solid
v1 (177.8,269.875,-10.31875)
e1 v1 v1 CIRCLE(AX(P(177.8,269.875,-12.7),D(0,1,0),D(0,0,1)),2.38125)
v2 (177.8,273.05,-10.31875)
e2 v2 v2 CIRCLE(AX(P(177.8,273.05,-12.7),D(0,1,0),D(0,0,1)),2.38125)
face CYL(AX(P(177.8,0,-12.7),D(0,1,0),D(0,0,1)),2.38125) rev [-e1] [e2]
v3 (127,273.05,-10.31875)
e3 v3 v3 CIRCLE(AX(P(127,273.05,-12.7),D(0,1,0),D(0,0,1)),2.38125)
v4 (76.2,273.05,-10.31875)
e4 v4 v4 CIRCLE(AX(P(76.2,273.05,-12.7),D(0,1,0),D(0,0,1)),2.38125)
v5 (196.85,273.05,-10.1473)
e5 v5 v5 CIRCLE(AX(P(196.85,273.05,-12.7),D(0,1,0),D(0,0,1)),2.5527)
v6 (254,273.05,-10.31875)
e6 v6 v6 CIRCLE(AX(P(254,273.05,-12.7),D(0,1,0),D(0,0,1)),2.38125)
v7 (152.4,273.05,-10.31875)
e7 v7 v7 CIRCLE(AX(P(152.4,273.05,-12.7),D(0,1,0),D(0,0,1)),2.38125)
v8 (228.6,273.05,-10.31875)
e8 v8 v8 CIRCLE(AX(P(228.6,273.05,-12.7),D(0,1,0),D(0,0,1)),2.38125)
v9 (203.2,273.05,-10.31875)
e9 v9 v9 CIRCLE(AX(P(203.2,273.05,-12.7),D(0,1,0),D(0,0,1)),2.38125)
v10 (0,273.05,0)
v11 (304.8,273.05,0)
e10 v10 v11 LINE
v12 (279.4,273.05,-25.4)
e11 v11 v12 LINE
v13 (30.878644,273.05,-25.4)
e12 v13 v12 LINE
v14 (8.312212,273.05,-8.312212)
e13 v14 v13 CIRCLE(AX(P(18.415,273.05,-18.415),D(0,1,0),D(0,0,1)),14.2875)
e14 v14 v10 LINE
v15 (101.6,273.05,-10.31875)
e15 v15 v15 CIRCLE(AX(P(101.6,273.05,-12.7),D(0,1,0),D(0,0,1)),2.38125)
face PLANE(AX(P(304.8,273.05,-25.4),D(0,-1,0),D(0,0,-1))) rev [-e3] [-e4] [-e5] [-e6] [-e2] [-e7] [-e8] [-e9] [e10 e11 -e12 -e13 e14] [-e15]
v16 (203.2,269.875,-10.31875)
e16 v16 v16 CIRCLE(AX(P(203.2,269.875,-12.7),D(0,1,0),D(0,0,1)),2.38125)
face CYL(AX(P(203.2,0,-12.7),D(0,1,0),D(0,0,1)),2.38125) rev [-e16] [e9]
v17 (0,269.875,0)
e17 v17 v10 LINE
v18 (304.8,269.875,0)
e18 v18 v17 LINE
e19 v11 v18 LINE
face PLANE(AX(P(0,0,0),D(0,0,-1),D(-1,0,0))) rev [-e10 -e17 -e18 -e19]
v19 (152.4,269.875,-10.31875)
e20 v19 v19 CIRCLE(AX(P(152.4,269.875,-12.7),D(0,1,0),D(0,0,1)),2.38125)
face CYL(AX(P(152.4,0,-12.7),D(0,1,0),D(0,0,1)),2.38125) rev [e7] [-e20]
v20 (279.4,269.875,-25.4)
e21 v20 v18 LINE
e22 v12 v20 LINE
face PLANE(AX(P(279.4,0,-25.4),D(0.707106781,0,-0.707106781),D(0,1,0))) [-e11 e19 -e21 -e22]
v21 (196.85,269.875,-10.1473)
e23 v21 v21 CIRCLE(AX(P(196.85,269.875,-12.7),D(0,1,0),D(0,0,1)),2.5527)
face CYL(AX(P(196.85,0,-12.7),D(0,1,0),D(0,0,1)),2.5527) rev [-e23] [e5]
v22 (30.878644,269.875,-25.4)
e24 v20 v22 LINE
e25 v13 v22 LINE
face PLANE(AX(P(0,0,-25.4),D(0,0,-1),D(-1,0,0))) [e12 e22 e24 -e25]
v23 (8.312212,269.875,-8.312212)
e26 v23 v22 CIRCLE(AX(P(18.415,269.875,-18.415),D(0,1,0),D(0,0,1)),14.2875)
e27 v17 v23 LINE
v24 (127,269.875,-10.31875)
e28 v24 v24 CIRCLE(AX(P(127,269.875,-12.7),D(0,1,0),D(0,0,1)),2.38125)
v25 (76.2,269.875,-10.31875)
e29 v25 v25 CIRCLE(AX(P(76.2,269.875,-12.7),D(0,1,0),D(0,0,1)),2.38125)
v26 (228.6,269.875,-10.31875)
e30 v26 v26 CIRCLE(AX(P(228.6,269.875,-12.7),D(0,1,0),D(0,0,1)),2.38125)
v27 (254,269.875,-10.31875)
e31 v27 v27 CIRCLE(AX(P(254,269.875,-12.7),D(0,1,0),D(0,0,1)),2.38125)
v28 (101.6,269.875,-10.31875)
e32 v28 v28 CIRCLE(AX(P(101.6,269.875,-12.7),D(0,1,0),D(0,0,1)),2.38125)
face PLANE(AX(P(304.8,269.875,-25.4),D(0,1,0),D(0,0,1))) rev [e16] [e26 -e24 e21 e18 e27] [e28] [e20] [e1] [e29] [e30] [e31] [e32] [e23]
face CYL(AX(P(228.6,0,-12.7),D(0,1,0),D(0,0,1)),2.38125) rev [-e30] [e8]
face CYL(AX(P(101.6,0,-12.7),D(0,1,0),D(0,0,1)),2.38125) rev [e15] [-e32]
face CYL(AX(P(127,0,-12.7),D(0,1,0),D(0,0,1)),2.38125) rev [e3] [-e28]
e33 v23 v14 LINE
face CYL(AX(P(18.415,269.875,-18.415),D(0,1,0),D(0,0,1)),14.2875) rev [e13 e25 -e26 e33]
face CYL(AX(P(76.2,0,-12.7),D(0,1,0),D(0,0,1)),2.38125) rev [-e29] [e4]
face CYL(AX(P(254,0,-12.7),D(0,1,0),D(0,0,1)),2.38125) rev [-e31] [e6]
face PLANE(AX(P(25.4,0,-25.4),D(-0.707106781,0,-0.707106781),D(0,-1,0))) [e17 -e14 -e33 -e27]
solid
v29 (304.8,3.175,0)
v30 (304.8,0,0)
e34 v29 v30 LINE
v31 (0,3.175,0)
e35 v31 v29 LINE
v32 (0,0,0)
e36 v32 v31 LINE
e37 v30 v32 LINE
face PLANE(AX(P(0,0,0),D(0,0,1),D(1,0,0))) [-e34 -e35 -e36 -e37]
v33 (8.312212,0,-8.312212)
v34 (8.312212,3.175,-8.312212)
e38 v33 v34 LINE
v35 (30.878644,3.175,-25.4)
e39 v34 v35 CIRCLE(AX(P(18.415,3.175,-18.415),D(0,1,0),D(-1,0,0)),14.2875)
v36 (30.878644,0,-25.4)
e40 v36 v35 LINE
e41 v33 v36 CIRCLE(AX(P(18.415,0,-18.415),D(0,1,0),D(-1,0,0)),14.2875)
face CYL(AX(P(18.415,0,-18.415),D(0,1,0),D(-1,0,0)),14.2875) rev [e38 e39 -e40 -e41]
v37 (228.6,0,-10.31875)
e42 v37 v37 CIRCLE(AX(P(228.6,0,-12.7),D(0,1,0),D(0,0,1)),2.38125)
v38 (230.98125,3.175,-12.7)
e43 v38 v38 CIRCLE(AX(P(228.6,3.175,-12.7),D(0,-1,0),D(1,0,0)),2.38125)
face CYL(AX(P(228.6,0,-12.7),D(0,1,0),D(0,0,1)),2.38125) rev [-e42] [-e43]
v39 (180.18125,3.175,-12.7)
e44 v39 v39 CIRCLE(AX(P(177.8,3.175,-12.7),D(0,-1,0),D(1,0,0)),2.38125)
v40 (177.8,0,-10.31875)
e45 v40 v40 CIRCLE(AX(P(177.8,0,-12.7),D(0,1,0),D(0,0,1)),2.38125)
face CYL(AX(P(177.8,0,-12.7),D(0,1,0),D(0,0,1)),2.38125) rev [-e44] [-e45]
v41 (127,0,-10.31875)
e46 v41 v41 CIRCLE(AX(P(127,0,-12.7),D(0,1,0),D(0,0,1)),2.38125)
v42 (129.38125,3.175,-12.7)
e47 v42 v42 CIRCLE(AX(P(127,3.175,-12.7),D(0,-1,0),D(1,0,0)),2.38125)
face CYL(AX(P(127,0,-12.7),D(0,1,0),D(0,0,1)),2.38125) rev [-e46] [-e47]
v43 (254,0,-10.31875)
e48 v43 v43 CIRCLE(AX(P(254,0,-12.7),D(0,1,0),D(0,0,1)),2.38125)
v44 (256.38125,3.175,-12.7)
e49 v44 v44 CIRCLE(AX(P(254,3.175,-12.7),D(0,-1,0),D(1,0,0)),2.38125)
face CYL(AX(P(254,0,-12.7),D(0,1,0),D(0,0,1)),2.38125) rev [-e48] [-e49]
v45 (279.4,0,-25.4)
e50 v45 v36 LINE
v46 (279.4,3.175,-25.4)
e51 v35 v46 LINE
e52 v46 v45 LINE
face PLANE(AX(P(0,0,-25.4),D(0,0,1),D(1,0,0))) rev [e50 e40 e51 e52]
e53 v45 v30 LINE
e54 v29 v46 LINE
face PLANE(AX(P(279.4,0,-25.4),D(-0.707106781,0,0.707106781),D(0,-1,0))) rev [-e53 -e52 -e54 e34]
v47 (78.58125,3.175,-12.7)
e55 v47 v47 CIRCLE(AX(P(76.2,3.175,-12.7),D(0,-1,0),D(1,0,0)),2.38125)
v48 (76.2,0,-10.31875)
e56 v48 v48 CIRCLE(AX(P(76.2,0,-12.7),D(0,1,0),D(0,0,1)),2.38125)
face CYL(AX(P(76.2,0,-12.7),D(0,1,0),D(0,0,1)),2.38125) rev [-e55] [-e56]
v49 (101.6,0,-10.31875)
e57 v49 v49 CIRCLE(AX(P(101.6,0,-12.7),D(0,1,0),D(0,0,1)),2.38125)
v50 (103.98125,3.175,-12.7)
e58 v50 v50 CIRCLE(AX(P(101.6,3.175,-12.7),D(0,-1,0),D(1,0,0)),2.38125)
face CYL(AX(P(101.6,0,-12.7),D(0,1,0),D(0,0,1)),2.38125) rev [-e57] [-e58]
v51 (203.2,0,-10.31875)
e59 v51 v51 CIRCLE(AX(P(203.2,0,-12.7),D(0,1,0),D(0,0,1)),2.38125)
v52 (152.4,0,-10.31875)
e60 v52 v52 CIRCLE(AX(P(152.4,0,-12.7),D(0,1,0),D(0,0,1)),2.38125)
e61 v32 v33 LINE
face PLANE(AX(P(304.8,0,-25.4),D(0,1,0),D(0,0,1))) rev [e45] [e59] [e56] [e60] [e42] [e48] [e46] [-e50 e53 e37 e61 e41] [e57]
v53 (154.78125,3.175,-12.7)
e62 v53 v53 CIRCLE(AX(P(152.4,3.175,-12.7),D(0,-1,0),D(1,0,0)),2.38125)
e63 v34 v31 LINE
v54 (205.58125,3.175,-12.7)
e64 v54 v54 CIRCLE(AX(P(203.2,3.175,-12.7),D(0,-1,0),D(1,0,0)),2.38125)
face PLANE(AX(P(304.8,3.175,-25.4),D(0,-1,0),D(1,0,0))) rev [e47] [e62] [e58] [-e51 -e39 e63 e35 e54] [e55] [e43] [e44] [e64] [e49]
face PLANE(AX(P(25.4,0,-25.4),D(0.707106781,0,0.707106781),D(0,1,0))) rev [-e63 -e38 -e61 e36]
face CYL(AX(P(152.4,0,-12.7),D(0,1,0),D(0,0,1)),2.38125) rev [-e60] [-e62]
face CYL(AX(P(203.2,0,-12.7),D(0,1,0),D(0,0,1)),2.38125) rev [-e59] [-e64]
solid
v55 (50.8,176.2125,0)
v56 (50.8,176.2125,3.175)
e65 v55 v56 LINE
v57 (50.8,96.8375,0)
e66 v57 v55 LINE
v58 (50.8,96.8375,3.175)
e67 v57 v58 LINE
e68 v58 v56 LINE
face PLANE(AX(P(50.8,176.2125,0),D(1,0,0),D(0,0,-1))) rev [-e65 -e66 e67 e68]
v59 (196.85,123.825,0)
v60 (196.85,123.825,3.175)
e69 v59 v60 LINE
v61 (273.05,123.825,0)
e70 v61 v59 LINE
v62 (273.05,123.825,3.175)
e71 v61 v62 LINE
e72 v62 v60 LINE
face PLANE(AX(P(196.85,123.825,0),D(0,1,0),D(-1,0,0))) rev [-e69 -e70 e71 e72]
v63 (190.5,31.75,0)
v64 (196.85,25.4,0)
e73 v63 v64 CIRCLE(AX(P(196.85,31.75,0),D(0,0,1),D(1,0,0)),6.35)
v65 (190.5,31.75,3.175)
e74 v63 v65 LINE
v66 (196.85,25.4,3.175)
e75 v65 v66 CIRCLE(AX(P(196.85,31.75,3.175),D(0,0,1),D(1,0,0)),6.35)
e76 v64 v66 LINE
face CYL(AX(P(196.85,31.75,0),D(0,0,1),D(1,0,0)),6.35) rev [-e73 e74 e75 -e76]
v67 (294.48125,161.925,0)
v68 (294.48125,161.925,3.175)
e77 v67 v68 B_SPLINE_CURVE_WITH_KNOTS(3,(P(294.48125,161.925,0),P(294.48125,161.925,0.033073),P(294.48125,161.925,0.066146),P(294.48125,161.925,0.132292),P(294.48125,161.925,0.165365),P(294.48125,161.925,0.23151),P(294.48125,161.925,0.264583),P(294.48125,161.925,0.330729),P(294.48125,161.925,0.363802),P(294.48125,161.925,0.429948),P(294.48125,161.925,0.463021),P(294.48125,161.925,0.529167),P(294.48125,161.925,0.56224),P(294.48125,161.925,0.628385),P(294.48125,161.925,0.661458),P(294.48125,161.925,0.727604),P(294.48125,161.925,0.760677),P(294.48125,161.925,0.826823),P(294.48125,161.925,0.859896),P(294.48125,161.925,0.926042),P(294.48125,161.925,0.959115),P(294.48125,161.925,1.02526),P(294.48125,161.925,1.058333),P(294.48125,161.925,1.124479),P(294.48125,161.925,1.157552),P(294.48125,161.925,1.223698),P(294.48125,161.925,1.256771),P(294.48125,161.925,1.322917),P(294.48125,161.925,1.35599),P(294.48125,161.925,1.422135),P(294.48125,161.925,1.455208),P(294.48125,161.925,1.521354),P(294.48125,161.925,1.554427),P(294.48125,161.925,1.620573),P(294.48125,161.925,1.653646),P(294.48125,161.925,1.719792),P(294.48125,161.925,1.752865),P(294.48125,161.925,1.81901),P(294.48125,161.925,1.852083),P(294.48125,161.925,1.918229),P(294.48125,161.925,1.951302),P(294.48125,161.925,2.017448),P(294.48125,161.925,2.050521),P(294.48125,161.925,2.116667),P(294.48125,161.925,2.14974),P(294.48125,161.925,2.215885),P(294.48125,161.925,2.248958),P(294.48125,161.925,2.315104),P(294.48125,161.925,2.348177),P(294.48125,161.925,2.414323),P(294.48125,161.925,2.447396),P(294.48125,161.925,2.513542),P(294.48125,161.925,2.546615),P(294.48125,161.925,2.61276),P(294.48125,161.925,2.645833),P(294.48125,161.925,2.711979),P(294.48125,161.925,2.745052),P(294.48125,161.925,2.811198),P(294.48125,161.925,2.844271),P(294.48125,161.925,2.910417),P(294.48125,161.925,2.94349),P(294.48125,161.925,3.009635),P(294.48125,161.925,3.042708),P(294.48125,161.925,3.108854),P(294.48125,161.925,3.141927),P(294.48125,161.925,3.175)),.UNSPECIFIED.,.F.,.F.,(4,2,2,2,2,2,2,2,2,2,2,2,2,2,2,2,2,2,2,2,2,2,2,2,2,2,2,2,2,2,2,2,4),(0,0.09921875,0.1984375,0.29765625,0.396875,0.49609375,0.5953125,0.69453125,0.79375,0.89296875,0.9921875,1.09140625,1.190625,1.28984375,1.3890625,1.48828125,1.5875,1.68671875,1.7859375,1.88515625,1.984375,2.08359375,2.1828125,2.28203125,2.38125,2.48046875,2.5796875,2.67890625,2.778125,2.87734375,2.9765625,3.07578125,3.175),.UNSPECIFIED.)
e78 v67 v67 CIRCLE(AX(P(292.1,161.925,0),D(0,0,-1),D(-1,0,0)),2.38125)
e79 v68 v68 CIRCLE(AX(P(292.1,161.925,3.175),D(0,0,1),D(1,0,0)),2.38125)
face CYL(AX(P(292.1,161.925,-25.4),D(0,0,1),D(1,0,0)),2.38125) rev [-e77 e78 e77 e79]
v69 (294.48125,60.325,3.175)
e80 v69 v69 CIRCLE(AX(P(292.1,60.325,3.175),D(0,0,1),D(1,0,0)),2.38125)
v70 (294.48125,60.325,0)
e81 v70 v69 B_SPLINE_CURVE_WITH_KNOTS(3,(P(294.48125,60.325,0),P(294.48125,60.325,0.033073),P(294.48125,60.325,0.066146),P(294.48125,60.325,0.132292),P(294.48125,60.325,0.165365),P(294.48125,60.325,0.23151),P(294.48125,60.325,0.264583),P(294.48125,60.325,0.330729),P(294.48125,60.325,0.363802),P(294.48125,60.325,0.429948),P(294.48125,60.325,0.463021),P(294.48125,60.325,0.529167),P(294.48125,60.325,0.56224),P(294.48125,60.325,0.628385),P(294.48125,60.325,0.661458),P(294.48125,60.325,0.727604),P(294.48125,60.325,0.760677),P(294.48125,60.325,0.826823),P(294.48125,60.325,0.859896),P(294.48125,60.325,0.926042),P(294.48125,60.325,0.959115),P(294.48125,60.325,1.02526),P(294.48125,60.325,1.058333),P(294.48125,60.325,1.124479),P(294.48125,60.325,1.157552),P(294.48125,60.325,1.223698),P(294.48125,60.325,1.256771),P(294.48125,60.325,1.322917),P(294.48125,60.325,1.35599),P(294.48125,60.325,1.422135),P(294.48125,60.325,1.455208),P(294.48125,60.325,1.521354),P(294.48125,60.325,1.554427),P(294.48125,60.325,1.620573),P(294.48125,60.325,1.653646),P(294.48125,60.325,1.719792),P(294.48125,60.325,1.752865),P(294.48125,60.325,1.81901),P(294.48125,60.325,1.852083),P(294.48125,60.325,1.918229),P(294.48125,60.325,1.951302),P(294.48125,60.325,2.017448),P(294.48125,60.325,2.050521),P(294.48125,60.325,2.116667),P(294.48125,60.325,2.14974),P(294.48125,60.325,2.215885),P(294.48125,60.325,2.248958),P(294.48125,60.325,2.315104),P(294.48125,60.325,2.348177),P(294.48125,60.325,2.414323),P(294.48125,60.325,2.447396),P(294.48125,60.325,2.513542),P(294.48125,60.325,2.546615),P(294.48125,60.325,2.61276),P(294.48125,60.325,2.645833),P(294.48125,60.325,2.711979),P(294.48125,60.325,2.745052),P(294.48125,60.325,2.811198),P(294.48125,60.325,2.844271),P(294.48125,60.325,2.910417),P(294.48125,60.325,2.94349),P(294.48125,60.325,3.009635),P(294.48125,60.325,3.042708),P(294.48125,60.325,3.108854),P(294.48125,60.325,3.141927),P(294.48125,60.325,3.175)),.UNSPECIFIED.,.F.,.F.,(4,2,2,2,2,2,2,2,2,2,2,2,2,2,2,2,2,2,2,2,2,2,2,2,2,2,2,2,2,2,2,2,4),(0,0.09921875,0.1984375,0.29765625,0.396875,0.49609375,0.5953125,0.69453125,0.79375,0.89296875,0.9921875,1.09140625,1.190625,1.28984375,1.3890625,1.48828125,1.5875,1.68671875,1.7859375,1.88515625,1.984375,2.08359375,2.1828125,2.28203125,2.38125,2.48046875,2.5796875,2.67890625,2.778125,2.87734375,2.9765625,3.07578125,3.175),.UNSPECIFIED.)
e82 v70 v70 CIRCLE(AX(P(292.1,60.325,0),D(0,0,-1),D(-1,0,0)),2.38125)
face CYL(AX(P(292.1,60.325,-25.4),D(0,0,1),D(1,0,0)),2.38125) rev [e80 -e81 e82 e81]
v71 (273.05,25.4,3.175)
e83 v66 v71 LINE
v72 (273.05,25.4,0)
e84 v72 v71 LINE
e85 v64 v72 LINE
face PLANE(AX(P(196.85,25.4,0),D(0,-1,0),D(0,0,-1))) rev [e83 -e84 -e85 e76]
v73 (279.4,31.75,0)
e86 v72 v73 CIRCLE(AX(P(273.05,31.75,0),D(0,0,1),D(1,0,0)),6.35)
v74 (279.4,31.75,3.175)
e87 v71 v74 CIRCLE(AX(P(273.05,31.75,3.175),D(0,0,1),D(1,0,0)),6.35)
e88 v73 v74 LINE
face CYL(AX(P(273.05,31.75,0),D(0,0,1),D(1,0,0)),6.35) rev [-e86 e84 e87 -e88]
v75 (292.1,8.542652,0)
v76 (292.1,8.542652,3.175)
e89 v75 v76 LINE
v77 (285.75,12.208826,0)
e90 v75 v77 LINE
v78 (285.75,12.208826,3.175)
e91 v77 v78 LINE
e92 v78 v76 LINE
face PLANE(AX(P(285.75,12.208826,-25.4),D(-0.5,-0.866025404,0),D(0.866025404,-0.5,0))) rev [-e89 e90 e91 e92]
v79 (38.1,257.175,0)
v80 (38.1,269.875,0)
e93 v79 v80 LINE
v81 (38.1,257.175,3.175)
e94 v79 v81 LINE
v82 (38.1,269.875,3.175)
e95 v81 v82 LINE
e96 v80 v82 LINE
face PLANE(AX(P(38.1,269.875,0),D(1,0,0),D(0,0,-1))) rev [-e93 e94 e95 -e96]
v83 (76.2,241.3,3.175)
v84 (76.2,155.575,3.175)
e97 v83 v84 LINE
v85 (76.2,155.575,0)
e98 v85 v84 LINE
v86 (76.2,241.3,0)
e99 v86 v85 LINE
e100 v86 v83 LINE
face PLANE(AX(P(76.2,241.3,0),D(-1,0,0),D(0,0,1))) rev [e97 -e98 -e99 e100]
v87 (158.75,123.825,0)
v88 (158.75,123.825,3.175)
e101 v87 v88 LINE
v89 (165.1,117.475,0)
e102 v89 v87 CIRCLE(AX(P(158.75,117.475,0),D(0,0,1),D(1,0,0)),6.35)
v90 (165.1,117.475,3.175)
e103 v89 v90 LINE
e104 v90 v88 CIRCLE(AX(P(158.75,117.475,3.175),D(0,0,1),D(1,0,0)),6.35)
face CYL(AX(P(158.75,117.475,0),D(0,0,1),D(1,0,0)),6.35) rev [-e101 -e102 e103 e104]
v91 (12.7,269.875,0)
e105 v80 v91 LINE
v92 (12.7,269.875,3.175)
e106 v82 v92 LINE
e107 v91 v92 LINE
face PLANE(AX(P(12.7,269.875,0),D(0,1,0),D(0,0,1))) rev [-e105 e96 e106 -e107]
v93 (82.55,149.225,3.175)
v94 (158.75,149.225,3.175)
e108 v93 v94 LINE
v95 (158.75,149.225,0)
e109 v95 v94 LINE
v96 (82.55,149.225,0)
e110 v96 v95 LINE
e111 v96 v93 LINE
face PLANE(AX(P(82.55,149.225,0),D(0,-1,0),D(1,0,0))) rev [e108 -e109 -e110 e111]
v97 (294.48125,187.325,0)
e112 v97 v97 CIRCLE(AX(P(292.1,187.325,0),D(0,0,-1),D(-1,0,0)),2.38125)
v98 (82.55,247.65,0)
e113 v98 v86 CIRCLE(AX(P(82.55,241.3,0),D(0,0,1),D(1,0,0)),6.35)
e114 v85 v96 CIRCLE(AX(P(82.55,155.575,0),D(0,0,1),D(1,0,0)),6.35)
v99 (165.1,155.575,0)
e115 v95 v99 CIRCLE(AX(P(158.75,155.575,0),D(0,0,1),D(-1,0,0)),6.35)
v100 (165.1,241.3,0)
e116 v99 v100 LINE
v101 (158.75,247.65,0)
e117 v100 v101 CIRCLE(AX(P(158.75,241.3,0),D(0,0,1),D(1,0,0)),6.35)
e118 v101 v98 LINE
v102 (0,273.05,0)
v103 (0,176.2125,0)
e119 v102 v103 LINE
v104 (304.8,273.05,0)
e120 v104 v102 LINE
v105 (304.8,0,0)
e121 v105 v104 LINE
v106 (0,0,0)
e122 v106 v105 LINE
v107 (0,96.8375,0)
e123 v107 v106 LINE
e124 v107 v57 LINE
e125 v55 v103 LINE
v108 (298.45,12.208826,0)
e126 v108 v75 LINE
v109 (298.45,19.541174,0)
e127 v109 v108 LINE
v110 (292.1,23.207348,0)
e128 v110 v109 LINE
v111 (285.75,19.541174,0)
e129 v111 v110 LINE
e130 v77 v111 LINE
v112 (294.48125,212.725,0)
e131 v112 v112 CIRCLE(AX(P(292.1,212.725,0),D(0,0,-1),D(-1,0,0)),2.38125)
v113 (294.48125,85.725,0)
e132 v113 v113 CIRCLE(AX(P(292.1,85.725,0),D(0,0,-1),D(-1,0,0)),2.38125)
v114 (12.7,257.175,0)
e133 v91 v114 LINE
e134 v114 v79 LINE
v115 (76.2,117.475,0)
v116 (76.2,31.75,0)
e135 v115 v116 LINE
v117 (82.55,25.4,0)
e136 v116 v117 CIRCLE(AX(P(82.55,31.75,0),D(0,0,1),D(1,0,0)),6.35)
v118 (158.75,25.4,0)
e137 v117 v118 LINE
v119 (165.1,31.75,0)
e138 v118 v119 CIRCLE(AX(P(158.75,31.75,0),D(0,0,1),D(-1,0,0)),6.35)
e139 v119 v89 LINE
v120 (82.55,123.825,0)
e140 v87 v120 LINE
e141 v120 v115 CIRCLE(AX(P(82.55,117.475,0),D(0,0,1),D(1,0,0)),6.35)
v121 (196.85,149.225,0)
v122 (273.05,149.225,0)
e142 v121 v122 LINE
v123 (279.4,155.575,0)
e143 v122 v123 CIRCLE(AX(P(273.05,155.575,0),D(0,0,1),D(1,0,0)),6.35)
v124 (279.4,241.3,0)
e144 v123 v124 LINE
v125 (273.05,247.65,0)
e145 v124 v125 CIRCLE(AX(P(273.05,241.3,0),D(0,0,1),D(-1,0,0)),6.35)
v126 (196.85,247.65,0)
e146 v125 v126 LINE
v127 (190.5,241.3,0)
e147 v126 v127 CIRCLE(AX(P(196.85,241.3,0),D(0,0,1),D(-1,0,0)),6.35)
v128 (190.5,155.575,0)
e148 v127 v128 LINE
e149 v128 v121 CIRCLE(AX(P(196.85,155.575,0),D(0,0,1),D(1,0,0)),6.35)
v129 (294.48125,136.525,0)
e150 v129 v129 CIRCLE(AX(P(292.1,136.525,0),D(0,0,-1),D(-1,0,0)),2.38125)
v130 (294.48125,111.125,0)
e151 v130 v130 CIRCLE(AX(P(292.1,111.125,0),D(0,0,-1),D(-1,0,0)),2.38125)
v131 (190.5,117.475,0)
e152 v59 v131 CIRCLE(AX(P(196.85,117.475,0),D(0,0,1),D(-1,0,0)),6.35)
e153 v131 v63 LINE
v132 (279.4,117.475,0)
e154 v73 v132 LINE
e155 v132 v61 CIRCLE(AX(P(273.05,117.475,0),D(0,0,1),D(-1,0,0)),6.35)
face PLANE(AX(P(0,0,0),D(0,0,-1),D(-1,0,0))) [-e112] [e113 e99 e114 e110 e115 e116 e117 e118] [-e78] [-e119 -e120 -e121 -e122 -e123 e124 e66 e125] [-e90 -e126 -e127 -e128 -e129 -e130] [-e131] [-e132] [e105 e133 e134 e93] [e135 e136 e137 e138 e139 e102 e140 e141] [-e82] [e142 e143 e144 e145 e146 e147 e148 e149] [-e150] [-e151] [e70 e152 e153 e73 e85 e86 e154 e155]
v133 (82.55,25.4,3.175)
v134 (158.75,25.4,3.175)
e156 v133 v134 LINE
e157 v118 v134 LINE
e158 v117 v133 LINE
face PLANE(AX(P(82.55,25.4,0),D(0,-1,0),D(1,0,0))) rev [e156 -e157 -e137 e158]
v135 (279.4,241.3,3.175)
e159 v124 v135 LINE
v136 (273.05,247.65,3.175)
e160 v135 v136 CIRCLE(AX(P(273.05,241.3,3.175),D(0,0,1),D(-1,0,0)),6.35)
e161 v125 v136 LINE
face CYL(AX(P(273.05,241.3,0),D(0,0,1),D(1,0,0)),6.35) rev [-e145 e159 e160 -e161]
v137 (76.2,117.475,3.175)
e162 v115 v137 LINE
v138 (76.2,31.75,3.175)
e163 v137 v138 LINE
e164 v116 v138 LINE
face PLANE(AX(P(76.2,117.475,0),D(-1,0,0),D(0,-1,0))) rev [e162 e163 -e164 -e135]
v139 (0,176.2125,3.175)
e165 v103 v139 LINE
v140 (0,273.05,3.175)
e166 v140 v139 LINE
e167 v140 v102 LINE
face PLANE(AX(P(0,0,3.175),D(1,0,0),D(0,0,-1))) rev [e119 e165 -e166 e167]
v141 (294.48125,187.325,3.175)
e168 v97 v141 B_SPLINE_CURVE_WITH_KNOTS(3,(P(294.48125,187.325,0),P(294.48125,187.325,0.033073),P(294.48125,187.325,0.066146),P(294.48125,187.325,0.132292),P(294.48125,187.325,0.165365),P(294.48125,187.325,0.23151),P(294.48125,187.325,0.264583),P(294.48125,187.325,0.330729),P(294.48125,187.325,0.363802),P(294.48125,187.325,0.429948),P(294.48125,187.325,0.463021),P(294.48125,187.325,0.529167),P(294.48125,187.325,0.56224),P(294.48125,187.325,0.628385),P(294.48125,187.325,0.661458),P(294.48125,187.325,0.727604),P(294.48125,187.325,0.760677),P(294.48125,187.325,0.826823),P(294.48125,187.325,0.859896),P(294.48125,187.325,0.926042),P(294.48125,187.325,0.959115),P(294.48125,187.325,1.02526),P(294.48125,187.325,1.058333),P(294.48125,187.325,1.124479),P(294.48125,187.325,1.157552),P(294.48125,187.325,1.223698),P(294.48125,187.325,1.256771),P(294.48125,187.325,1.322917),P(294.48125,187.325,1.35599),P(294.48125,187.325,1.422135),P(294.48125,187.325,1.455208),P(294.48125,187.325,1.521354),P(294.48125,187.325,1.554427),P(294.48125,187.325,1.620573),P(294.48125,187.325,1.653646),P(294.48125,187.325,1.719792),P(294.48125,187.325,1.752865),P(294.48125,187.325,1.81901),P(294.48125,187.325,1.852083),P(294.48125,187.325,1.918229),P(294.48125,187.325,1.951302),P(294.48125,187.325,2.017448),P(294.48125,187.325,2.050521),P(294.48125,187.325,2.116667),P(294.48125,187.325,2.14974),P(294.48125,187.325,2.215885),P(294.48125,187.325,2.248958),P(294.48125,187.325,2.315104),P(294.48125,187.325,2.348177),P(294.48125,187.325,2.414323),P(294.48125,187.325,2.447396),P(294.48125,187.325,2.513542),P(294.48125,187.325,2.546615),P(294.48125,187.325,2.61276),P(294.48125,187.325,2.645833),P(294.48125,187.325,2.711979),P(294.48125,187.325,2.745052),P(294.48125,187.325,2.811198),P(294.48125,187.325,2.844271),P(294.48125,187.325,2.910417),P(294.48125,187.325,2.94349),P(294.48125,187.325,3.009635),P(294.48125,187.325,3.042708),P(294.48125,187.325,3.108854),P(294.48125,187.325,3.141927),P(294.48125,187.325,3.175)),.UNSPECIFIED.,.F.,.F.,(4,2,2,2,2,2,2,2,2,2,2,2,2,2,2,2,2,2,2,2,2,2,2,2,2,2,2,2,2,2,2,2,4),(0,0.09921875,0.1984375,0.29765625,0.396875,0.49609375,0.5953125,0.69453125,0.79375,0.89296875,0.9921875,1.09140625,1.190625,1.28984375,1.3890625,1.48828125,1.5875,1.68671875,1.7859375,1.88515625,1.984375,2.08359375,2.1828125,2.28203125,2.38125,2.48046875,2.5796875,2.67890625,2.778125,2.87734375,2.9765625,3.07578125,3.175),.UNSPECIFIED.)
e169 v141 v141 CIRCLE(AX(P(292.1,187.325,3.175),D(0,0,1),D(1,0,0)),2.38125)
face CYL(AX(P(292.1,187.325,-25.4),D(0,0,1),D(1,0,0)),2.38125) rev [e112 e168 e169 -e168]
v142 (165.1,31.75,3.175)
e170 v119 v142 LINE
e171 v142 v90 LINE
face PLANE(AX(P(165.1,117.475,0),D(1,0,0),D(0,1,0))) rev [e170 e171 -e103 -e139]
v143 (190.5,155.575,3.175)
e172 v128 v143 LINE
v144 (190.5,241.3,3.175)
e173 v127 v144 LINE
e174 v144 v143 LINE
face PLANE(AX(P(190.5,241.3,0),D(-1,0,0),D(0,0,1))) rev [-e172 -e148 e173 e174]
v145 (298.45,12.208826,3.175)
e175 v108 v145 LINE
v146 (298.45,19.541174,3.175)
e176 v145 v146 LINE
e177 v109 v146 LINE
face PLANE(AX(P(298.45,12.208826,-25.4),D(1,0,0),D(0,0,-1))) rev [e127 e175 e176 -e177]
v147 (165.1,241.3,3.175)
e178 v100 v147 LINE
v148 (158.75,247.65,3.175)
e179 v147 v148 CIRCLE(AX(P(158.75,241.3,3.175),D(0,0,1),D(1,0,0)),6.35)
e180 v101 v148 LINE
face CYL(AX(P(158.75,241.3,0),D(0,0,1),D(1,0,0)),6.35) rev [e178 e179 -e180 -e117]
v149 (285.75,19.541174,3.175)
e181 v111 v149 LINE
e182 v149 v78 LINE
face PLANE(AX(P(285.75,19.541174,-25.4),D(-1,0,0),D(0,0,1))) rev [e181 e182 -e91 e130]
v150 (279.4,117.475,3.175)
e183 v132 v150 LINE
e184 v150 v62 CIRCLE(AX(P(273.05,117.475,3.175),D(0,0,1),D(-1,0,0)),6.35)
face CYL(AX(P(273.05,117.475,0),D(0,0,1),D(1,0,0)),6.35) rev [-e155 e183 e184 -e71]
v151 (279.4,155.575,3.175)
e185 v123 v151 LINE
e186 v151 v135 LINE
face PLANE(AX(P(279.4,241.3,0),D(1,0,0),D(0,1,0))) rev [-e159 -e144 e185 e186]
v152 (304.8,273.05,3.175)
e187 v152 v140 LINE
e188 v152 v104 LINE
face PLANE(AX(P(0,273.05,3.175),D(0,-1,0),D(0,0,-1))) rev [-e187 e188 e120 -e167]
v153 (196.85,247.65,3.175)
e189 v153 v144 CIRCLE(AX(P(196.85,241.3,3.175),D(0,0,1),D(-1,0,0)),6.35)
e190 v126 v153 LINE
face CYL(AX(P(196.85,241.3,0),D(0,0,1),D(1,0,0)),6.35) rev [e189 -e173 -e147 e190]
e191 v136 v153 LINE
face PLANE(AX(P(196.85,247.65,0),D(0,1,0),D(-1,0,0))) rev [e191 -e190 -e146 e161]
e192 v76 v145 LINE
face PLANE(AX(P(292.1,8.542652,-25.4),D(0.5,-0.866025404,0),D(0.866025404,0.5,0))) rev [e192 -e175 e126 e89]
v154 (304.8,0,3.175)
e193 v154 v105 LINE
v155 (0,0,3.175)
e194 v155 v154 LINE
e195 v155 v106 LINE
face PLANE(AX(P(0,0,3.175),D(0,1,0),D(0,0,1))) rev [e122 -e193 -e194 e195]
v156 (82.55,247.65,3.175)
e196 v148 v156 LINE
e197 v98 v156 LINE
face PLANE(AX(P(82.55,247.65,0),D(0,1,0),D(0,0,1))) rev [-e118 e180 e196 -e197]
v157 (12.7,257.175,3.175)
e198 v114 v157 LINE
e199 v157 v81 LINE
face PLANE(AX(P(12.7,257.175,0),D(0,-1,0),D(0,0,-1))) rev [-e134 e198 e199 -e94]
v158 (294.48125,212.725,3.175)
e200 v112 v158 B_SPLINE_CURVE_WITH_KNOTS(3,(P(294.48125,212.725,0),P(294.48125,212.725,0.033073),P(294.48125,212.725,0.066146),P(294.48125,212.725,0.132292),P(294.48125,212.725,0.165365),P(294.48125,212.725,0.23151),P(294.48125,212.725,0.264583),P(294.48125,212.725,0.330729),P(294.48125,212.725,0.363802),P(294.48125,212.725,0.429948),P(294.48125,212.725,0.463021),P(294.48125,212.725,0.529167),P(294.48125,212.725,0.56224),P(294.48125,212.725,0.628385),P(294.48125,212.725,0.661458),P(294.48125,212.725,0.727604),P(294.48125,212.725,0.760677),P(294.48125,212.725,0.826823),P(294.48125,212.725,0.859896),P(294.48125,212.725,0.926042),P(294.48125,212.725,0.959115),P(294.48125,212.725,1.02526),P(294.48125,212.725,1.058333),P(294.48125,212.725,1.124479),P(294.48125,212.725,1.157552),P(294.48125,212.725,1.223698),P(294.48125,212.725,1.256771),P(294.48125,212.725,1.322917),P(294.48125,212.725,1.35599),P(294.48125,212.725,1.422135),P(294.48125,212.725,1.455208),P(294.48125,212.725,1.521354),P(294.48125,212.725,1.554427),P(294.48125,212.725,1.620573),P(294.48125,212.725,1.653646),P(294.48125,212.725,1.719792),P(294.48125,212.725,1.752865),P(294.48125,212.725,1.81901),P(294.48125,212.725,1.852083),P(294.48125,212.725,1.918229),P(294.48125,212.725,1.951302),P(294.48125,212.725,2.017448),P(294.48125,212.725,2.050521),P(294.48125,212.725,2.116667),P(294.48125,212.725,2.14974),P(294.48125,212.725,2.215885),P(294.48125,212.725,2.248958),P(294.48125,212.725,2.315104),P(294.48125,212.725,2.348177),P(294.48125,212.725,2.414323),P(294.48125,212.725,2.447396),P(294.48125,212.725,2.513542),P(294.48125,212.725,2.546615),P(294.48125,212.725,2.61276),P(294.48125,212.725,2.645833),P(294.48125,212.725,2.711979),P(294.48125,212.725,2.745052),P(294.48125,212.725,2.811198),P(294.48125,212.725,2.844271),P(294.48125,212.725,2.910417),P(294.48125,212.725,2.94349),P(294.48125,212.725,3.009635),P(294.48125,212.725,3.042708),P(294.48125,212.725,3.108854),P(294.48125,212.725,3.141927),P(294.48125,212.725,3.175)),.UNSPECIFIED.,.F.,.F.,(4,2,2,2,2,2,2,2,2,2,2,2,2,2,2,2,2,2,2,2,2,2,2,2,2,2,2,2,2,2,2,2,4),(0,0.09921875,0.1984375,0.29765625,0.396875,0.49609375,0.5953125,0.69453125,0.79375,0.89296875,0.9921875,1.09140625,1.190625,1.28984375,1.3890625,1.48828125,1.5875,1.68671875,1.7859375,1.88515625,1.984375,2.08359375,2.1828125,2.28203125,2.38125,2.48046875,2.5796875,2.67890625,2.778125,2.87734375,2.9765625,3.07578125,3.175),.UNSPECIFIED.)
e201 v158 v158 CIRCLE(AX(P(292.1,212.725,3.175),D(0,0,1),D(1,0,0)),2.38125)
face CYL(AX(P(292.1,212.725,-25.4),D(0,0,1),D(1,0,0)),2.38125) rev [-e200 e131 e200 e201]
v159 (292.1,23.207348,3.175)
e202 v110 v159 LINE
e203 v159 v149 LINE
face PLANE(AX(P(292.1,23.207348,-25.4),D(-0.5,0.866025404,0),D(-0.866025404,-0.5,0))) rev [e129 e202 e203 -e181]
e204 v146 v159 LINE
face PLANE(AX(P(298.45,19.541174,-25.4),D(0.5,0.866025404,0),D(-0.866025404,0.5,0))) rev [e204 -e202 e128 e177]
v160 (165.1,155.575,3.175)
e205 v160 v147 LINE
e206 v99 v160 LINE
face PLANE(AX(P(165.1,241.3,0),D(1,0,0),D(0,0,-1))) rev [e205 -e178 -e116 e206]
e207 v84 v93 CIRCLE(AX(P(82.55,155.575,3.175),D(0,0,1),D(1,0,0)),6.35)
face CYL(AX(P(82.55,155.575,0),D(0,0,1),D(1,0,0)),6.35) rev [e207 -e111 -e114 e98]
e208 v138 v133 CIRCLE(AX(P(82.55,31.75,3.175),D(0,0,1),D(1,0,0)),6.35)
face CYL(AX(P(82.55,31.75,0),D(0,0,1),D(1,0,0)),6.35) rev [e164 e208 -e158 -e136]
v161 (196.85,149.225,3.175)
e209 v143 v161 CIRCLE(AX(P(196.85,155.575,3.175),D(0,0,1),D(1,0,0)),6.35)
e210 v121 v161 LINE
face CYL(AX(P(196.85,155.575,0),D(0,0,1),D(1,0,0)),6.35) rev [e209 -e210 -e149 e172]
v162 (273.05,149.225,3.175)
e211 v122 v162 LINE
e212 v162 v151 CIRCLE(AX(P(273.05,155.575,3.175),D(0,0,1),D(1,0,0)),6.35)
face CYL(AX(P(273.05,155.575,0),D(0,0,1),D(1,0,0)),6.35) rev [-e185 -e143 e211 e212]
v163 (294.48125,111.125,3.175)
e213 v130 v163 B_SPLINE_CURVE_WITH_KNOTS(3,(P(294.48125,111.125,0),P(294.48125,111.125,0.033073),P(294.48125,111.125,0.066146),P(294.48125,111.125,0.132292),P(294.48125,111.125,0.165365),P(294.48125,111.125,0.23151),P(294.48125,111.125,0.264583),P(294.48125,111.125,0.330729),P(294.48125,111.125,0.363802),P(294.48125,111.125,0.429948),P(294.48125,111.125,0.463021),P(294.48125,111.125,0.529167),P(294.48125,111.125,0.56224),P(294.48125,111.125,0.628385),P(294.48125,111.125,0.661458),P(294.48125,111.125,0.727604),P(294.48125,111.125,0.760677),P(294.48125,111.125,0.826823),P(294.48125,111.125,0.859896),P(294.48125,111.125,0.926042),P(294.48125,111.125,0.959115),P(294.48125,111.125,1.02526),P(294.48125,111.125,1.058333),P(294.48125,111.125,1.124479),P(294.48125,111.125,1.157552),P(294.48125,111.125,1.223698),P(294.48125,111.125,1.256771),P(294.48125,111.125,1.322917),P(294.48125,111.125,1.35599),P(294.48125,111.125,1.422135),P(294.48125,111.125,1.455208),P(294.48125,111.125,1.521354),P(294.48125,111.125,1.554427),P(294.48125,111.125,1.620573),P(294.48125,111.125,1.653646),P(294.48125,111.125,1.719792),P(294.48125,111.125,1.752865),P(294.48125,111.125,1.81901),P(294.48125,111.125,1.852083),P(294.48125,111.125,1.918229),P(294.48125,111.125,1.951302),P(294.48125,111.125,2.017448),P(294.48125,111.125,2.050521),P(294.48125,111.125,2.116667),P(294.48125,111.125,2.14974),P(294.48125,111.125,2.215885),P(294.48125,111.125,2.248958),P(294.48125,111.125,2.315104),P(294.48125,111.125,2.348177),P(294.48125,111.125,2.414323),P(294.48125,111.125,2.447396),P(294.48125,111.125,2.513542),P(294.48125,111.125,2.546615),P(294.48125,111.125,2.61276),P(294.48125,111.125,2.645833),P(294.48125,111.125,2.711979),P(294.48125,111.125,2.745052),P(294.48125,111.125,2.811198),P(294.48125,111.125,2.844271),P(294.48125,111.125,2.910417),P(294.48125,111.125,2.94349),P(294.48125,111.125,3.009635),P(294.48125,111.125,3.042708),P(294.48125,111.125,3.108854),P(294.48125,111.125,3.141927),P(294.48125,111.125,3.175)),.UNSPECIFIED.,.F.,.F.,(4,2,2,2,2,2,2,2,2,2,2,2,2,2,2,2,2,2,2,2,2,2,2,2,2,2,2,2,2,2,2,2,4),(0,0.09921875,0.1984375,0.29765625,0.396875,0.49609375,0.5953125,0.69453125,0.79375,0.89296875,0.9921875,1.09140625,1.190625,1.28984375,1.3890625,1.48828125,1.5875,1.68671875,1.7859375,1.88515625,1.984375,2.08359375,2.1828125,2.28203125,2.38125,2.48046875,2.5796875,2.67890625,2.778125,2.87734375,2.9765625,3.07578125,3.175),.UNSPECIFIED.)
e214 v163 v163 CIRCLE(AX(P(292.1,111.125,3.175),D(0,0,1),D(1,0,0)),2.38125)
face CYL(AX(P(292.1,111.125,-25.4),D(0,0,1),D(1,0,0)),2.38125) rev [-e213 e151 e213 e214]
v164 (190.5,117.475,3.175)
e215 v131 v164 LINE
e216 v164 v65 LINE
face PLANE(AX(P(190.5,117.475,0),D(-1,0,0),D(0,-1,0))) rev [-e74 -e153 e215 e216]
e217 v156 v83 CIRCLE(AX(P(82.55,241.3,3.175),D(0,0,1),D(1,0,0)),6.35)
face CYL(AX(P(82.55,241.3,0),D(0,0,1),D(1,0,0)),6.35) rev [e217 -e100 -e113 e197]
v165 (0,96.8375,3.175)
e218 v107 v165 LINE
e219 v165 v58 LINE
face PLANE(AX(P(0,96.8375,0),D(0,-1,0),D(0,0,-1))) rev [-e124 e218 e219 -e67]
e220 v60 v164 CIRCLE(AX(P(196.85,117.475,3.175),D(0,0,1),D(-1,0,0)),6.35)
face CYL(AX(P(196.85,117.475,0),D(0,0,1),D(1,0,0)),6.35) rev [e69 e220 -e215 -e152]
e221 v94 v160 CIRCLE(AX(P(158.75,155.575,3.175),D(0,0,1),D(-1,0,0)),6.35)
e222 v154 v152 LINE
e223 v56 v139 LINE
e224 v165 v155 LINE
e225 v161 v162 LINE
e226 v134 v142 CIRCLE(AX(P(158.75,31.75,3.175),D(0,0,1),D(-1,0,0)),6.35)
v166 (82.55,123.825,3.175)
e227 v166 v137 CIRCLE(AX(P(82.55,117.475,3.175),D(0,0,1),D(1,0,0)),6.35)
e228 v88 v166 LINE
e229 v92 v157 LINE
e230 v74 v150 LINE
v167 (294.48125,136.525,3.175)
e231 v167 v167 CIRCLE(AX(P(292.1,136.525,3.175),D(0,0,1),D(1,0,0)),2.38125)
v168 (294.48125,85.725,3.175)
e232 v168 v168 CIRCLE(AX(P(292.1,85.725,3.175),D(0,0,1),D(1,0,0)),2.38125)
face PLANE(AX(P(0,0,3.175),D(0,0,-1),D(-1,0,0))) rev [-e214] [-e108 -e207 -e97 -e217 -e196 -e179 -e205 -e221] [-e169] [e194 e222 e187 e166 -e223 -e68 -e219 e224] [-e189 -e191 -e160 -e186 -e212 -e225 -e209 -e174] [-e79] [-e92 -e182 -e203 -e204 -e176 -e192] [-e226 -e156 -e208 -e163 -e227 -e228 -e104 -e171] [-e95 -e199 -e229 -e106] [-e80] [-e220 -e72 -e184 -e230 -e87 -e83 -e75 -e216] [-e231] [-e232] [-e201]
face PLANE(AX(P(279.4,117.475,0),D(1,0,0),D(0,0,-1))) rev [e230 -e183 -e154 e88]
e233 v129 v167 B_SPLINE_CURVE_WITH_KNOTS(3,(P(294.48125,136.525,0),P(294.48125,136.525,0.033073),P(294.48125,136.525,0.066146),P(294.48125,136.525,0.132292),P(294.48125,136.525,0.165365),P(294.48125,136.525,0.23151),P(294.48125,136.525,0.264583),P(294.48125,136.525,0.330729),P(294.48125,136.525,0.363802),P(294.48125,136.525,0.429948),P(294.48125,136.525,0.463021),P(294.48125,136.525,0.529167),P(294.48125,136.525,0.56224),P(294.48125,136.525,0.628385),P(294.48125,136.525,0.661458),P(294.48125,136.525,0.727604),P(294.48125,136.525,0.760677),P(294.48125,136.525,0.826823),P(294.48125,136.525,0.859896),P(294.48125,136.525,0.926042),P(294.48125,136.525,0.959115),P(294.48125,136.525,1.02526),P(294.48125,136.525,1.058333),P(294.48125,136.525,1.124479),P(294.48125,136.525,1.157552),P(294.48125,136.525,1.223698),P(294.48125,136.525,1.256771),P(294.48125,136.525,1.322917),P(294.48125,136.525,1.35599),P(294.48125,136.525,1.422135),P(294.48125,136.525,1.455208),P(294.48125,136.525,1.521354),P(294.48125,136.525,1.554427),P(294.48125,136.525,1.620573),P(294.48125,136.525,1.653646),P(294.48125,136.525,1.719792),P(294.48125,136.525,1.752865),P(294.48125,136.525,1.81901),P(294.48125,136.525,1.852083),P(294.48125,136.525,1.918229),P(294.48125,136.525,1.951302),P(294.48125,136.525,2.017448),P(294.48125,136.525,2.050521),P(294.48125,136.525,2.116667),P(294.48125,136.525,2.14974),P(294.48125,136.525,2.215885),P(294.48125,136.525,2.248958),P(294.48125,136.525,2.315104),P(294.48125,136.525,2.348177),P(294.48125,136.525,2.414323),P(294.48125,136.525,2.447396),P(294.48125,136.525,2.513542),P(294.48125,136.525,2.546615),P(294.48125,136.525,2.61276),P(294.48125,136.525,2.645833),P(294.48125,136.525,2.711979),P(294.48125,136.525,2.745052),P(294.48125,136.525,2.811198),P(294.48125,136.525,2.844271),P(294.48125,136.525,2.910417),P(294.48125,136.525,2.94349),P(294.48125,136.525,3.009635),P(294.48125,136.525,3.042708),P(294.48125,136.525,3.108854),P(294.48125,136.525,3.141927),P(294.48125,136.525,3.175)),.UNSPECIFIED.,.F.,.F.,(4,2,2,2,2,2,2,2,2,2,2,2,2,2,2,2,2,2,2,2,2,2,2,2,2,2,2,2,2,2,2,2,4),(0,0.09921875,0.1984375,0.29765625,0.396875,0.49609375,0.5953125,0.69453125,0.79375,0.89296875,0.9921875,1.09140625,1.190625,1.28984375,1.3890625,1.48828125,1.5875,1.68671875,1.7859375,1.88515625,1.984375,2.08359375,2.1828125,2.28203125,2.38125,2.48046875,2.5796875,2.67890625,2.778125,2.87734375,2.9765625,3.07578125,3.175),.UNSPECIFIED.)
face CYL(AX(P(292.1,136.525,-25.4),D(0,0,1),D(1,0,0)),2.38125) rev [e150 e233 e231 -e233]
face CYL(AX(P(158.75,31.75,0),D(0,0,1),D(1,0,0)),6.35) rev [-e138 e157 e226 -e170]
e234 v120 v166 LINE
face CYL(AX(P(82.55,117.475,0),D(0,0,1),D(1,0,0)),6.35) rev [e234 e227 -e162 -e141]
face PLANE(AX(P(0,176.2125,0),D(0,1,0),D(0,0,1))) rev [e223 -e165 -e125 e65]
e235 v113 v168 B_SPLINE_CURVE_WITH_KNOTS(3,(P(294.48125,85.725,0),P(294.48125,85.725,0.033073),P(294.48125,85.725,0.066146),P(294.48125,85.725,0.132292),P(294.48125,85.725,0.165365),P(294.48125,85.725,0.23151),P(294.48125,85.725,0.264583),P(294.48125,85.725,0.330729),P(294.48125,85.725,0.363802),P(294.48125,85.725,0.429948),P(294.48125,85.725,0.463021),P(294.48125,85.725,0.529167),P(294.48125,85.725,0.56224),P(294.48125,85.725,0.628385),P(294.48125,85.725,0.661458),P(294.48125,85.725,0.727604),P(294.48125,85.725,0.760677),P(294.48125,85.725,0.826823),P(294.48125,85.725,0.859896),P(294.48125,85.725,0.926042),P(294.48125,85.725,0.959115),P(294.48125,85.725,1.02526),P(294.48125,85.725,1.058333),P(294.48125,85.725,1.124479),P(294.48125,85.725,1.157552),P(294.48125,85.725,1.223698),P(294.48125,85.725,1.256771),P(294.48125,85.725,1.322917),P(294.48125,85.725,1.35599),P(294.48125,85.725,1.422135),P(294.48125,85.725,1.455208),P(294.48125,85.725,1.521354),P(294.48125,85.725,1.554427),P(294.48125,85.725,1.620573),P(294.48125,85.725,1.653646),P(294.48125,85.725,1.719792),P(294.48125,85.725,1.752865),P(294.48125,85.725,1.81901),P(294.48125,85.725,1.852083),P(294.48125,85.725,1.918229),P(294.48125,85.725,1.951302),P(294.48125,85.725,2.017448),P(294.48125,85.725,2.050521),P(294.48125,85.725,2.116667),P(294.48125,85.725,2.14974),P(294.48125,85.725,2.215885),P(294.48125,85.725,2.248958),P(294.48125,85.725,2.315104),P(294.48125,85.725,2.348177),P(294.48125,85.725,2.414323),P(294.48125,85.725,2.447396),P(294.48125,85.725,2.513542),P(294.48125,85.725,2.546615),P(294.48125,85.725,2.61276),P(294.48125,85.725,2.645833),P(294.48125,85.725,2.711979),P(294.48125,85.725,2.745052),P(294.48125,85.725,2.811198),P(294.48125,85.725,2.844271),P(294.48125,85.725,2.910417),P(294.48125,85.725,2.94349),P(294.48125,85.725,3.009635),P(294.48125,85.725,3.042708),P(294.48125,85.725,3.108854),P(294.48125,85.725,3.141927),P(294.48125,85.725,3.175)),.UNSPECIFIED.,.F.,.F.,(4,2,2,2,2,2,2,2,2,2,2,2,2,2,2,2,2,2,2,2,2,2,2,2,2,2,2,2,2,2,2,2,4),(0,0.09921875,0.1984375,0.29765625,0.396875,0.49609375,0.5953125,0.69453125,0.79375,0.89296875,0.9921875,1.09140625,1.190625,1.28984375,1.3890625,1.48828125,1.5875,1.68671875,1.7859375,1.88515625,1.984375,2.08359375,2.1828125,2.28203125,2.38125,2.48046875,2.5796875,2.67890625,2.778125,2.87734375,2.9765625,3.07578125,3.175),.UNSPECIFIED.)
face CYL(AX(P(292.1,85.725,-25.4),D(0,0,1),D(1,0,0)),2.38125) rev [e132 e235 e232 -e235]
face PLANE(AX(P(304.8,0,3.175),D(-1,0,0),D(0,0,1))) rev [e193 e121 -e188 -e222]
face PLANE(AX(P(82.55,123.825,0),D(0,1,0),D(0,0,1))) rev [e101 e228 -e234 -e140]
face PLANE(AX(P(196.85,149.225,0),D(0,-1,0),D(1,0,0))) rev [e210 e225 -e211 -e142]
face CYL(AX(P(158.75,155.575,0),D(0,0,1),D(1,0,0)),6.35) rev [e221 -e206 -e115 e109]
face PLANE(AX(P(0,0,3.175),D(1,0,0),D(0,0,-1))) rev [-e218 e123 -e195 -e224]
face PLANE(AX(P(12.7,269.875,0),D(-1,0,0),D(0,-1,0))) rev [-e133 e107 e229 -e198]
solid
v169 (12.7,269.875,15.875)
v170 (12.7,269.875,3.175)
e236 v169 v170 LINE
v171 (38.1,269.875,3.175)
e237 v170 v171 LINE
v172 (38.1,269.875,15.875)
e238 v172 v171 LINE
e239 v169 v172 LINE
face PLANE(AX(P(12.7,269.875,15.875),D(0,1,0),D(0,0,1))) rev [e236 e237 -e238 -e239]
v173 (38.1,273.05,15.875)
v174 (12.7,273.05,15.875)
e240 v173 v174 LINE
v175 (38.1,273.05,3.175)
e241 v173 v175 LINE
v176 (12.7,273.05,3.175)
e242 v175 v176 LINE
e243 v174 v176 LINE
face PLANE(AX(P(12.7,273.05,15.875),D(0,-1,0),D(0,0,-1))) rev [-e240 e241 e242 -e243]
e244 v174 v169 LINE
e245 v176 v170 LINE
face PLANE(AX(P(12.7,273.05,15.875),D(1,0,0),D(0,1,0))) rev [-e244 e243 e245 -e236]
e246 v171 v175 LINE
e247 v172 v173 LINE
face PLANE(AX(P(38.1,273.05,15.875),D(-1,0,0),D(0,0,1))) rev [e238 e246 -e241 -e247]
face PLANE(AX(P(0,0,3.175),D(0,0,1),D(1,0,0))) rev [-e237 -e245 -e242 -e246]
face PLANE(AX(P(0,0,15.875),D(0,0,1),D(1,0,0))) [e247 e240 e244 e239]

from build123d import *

# Parameters (mm, degrees)
SKETCH1_W           = 304.8
SKETCH1_H           = 273.05
BOSS_EXTRUDE1_DEPTH = 3.175
SKETCH2_W           = 50.8
SKETCH2_H           = 79.375
CUT_EXTRUDE1_DEPTH  = 3.175
SKETCH4_W           = 304.8
SKETCH4_H           = 3.175
BASE_FLANGE1_DEPTH  = 25.4
SKETCH9_W           = 304.8
SKETCH9_H           = 3.175
BASE_FLANGE2_DEPTH  = 25.4
SKETCH12_W          = 25.4
SKETCH12_H          = 3.175
BASE_FLANGE3_DEPTH  = 12.7
CHAMFER1_SIZE       = 25.4
CHAMFER2_SIZE       = 25.4
SKETCH16_W          = 25.4
SKETCH16_H          = 12.7
CUT_EXTRUDE4_DEPTH  = 3.175
SKETCH17_R          = 2.38125
CUT_EXTRUDE5_DEPTH  = 411.005490817
SKETCH18_R          = 2.38125
CUT_EXTRUDE6_DEPTH  = 411.214423351
SKETCH19_R          = 14.2875
CUT_EXTRUDE7_DEPTH  = 3.175
SKETCH20_R          = 14.2875
CUT_EXTRUDE8_DEPTH  = 3.175
SKETCH21_R          = 2.5527
CUT_EXTRUDE9_DEPTH  = 411.005490817
CUT_EXTRUDE10_DEPTH = 411.214423351


# Sheet-metal steps are written as plain solids
with BuildPart() as part:
    # Sketch1 → Boss-Extrude1 (new body)
    with BuildSketch(Plane.XY):
        with Locations((152.4, 136.525)):
            Rectangle(SKETCH1_W, SKETCH1_H)
    extrude(amount=BOSS_EXTRUDE1_DEPTH)

    # Sketch2 → Cut-Extrude1 (cut)
    with BuildSketch(Plane.XY.offset(3.175)):
        with Locations((25.4, 136.525)):
            Rectangle(SKETCH2_W, SKETCH2_H)
        with BuildLine():
            Line((82.55, 247.65), (158.75, 247.65))
            ThreePointArc((158.75, 247.65), (163.240128061, 245.790128061), (165.1, 241.3))
            Line((165.1, 241.3), (165.1, 155.575))
            ThreePointArc((165.1, 155.575), (163.240128061, 151.084871939), (158.75, 149.225))
            Line((158.75, 149.225), (82.55, 149.225))
            ThreePointArc((82.55, 149.225), (78.059871939, 151.084871939), (76.2, 155.575))
            Line((76.2, 155.575), (76.2, 241.3))
            ThreePointArc((76.2, 241.3), (78.059871939, 245.790128061), (82.55, 247.65))
        make_face()
        with BuildLine():
            Line((279.4, 241.3), (279.4, 155.575))
            ThreePointArc((279.4, 155.575), (277.540128061, 151.084871939), (273.05, 149.225))
            Line((273.05, 149.225), (196.85, 149.225))
            ThreePointArc((196.85, 149.225), (192.359871939, 151.084871939), (190.5, 155.575))
            Line((190.5, 155.575), (190.5, 241.3))
            ThreePointArc((190.5, 241.3), (192.359871939, 245.790128061), (196.85, 247.65))
            Line((196.85, 247.65), (273.05, 247.65))
            ThreePointArc((273.05, 247.65), (277.540128061, 245.790128061), (279.4, 241.3))
        make_face()
        with BuildLine():
            Line((82.55, 123.825), (158.75, 123.825))
            ThreePointArc((158.75, 123.825), (163.240128061, 121.965128061), (165.1, 117.475))
            Line((165.1, 117.475), (165.1, 31.75))
            ThreePointArc((165.1, 31.75), (163.240128061, 27.259871939), (158.75, 25.4))
            Line((158.75, 25.4), (82.55, 25.4))
            ThreePointArc((82.55, 25.4), (78.059871939, 27.259871939), (76.2, 31.75))
            Line((76.2, 31.75), (76.2, 117.475))
            ThreePointArc((76.2, 117.475), (78.059871939, 121.965128061), (82.55, 123.825))
        make_face()
        with BuildLine():
            Line((279.4, 117.475), (279.4, 31.75))
            ThreePointArc((279.4, 31.75), (277.540128061, 27.259871939), (273.05, 25.4))
            Line((273.05, 25.4), (196.85, 25.4))
            ThreePointArc((196.85, 25.4), (192.359871939, 27.259871939), (190.5, 31.75))
            Line((190.5, 31.75), (190.5, 117.475))
            ThreePointArc((190.5, 117.475), (192.359871939, 121.965128061), (196.85, 123.825))
            Line((196.85, 123.825), (273.05, 123.825))
            ThreePointArc((273.05, 123.825), (277.540128061, 121.965128061), (279.4, 117.475))
        make_face()
    extrude(amount=-CUT_EXTRUDE1_DEPTH, mode=Mode.SUBTRACT)

    # Sketch16 → Cut-Extrude4 (cut)
    with BuildSketch(Plane.XY.offset(3.175)):
        with Locations((25.4, 263.525)):
            Rectangle(SKETCH16_W, SKETCH16_H)
    extrude(amount=-CUT_EXTRUDE4_DEPTH, mode=Mode.SUBTRACT)

    # Sketch18 → Cut-Extrude6 (cut, through all)
    with BuildSketch(Plane.XY.offset(3.175)):
        with Locations((292.1, 136.525)):
            Circle(SKETCH18_R)
        with Locations((292.1, 161.925)):
            Circle(SKETCH18_R)
        with Locations((292.1, 111.125)):
            Circle(SKETCH18_R)
        with Locations((292.1, 85.725)):
            Circle(SKETCH18_R)
        with Locations((292.1, 60.325)):
            Circle(SKETCH18_R)
        with Locations((292.1, 187.325)):
            Circle(SKETCH18_R)
        with Locations((292.1, 212.725)):
            Circle(SKETCH18_R)
    extrude(amount=-CUT_EXTRUDE6_DEPTH, mode=Mode.SUBTRACT)

    # Sketch22 → Cut-Extrude10 (cut, through all)
    with BuildSketch(Plane.XY.offset(3.175)):
        Polygon((292.1, 23.207348419), (285.75, 19.541174209), (285.75, 12.208825791), (292.1, 8.542651581), (298.45, 12.208825791), (298.45, 19.541174209), align=None)
    extrude(amount=-CUT_EXTRUDE10_DEPTH, mode=Mode.SUBTRACT)


with BuildPart() as body_2:
    # Sketch4 → Base-Flange1 (new body)
    with BuildSketch(Plane(origin=(0, 0, 0), x_dir=(-1, 0, 0), z_dir=(0, 0, -1))):
        with Locations((-152.4, 271.4625)):
            Rectangle(SKETCH4_W, SKETCH4_H)
    extrude(amount=BASE_FLANGE1_DEPTH)

    # Chamfer1
    chamfer1_edges = [body_2.edges().sort_by_distance(p)[0] for p in [
        (304.8, 271.4625, -25.4),
        (0, 271.4625, -25.4),
    ]]
    chamfer(chamfer1_edges, length=CHAMFER1_SIZE - 0.0001)  # a hair under: the kernel refuses the full size


with BuildPart() as body_3:
    # Sketch9 → Base-Flange2 (new body)
    with BuildSketch(Plane(origin=(0, 0, 0), x_dir=(-1, 0, 0), z_dir=(0, 0, -1))):
        with Locations((-152.4, 1.5875)):
            Rectangle(SKETCH9_W, SKETCH9_H)
    extrude(amount=BASE_FLANGE2_DEPTH)

    # Chamfer2
    chamfer2_edges = [body_3.edges().sort_by_distance(p)[0] for p in [
        (0, 1.5875, -25.4),
        (304.8, 1.5875, -25.4),
    ]]
    chamfer(chamfer2_edges, length=CHAMFER2_SIZE - 0.0001)  # a hair under: the kernel refuses the full size


with BuildPart() as body_4:
    # Sketch12 → Base-Flange3 (new body)
    with BuildSketch(Plane.XY.offset(3.175)):
        with Locations((25.4, 271.4625)):
            Rectangle(SKETCH12_W, SKETCH12_H)
    extrude(amount=BASE_FLANGE3_DEPTH)


with BuildPart() as cut_extrude5_tool:
    # Sketch17 → Cut-Extrude5 (new, through all)
    with BuildSketch(Plane(origin=(0, 273.05, 0), x_dir=(1, 0, 0), z_dir=(0, 1, 0))):
        with Locations(Location((76.2, 12.7, 0), (0, 0, 270))):
            Circle(SKETCH17_R)
        with Locations(Location((101.6, 12.7, 0), (0, 0, 270))):
            Circle(SKETCH17_R)
        with Locations(Location((127, 12.7, 0), (0, 0, 270))):
            Circle(SKETCH17_R)
        with Locations(Location((152.4, 12.7, 0), (0, 0, 270))):
            Circle(SKETCH17_R)
        with Locations(Location((177.8, 12.7, 0), (0, 0, 270))):
            Circle(SKETCH17_R)
        with Locations(Location((203.2, 12.7, 0), (0, 0, 270))):
            Circle(SKETCH17_R)
        with Locations(Location((228.6, 12.7, 0), (0, 0, 270))):
            Circle(SKETCH17_R)
        with Locations(Location((254, 12.7, 0), (0, 0, 270))):
            Circle(SKETCH17_R)
    extrude(amount=-CUT_EXTRUDE5_DEPTH)


with BuildPart() as body_2_1:
    add(body_2.part)

    # Cut-Extrude5: cut by cut_extrude5_tool
    add(cut_extrude5_tool.part, mode=Mode.SUBTRACT)

    # Sketch19 → Cut-Extrude7 (cut)
    with BuildSketch(Plane(origin=(0, 273.05, 0), x_dir=(1, 0, 0), z_dir=(0, 1, 0))):
        with Locations((18.415, 18.415)):
            Circle(SKETCH19_R)
    extrude(amount=-CUT_EXTRUDE7_DEPTH, mode=Mode.SUBTRACT)

    # Sketch21 → Cut-Extrude9 (cut, through all)
    with BuildSketch(Plane(origin=(0, 273.05, 0), x_dir=(1, 0, 0), z_dir=(0, 1, 0))):
        with Locations(Location((196.85, 12.7, 0), (0, 0, 270))):
            Circle(SKETCH21_R)
    extrude(amount=-CUT_EXTRUDE9_DEPTH, mode=Mode.SUBTRACT)


with BuildPart() as body_3_1:
    add(body_3.part)

    # Cut-Extrude5: cut by cut_extrude5_tool
    add(cut_extrude5_tool.part, mode=Mode.SUBTRACT)

    # Sketch20 → Cut-Extrude8 (cut)
    with BuildSketch(Plane(origin=(0, 3.175, 0), x_dir=(1, 0, 0), z_dir=(0, 1, 0))):
        with Locations((18.415, 18.415)):
            Circle(SKETCH20_R)
    extrude(amount=-CUT_EXTRUDE8_DEPTH, mode=Mode.SUBTRACT)


solid = Compound([part.part, body_4.part, body_2_1.part, body_3_1.part])
